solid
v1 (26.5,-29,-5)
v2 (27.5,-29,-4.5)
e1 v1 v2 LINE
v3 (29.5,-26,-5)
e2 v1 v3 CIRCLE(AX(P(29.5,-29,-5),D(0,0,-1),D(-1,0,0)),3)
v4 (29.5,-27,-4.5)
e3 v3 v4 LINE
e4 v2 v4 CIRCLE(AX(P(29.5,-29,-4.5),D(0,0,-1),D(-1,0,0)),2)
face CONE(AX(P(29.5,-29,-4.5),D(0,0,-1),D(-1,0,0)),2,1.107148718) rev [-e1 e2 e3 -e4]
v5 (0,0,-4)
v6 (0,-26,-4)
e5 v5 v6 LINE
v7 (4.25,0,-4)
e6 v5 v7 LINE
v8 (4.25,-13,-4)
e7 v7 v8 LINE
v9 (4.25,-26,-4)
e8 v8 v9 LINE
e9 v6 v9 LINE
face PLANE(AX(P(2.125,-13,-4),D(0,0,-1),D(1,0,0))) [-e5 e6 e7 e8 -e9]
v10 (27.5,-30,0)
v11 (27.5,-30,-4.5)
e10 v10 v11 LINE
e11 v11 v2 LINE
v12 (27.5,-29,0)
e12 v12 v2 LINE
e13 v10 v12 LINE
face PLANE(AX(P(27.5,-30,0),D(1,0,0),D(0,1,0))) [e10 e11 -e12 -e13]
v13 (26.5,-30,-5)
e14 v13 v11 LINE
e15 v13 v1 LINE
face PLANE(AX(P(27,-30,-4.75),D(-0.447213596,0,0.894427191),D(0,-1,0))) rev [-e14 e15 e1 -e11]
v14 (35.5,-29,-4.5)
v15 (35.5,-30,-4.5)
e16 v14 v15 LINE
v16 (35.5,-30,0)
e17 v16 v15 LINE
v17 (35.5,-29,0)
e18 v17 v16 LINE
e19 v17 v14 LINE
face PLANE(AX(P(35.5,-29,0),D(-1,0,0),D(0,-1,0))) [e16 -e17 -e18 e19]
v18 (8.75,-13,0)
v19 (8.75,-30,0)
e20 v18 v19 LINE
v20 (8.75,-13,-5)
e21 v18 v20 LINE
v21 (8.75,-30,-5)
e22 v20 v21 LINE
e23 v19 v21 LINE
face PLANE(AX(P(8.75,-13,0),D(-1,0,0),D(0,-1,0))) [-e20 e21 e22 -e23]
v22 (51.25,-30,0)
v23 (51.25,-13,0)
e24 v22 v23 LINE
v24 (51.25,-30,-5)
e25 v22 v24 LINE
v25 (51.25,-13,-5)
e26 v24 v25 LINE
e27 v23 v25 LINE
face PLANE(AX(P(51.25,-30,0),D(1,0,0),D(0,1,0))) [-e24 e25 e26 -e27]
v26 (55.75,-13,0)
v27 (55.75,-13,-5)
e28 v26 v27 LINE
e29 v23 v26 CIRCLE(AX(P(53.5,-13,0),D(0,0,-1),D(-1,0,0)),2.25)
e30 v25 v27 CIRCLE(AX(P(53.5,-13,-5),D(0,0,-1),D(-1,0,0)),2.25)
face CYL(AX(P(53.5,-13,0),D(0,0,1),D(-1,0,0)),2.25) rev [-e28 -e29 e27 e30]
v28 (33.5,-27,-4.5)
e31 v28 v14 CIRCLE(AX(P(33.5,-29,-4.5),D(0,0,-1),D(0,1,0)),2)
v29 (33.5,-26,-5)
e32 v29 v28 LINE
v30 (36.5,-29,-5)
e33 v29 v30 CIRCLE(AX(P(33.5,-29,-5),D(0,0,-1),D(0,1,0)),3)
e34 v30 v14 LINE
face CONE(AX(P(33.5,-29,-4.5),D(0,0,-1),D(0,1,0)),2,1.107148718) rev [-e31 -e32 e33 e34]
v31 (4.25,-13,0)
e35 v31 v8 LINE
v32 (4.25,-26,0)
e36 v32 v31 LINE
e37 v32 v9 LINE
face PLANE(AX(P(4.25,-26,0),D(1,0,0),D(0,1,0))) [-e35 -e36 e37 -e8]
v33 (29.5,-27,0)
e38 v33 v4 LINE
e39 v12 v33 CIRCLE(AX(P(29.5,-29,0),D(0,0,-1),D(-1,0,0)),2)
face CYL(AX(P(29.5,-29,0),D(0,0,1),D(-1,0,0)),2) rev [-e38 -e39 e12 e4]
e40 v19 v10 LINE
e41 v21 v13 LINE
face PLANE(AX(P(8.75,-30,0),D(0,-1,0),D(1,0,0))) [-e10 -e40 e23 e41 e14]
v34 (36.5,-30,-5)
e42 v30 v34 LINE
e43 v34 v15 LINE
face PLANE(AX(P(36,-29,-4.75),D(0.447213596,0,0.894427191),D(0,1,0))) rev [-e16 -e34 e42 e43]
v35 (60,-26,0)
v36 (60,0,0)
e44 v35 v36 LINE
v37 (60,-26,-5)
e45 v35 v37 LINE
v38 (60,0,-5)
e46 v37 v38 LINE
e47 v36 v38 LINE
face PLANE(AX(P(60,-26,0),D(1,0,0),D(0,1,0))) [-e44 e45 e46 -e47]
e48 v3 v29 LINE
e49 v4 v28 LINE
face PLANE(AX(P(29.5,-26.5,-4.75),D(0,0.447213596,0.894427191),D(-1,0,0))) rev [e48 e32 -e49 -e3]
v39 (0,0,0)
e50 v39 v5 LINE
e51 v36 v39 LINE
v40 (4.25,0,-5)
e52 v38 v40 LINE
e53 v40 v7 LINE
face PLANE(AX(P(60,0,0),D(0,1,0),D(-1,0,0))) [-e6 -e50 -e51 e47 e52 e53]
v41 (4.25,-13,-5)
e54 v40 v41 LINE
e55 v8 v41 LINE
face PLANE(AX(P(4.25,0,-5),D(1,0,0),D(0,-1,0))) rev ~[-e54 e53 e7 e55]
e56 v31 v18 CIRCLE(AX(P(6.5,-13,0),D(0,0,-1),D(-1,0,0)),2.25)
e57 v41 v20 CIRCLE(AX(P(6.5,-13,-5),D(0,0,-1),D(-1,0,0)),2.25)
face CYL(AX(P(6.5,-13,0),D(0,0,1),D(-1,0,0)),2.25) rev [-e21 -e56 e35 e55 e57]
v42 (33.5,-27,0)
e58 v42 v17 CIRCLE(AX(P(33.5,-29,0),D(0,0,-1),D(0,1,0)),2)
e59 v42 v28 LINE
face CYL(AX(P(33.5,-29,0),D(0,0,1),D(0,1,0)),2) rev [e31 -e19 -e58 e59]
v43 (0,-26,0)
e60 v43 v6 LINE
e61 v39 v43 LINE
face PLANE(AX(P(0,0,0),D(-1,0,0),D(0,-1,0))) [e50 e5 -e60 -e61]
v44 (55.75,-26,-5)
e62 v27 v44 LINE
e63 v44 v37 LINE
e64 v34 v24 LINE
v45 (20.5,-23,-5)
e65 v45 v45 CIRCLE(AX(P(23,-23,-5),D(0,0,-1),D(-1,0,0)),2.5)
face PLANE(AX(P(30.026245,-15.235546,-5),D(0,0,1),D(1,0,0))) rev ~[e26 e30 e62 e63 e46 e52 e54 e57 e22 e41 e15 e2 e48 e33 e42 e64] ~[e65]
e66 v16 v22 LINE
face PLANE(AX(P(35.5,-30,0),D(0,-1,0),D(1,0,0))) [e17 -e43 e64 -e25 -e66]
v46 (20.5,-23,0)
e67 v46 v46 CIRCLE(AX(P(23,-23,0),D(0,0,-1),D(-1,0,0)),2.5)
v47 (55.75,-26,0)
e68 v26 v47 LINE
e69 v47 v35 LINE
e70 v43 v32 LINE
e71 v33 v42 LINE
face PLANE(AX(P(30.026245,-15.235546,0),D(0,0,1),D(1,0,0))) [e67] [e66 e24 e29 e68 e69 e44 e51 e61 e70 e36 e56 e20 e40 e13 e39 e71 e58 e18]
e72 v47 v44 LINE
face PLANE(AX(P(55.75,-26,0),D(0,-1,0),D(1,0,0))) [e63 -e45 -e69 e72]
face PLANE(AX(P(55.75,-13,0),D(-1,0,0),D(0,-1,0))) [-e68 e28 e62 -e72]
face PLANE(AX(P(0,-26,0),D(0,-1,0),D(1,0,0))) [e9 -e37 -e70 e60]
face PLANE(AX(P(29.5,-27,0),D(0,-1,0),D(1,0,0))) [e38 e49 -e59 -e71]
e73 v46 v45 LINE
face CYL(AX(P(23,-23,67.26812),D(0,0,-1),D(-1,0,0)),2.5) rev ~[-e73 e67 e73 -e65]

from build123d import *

# Parameters (mm, degrees)
F1_DEPTH = 5
F2_D     = 5
F3_SIZE2 = 0.5
F3_SIZE  = 1
F4_W     = 4.25
F4_H     = 26
F5_DEPTH = 1


with BuildPart() as f1:
    # F0 (on Top) → F1 (new body)
    with BuildSketch(Plane.XY):
        with BuildLine():
            Line((60, 0), (0, 0))
            Line((0, 0), (0, -26))
            Line((0, -26), (4.25, -26))
            Line((4.25, -26), (4.25, -13))
            ThreePointArc((4.25, -13), (6.5, -10.75), (8.75, -13))
            Line((8.75, -13), (8.75, -30))
            Line((8.75, -30), (27.5, -30))
            Line((27.5, -30), (27.5, -29))
            ThreePointArc((27.5, -29), (28.0857864376, -27.5857864376), (29.5, -27))
            Line((29.5, -27), (33.5, -27))
            ThreePointArc((33.5, -27), (34.9142135624, -27.5857864376), (35.5, -29))
            Line((35.5, -29), (35.5, -30))
            Line((35.5, -30), (51.25, -30))
            Line((51.25, -30), (51.25, -13))
            ThreePointArc((51.25, -13), (53.5, -10.75), (55.75, -13))
            Line((55.75, -13), (55.75, -26))
            Line((55.75, -26), (60, -26))
            Line((60, -26), (60, 0))
        make_face()
    extrude(amount=-F1_DEPTH)

    # F2 (through all)
    with Locations(Plane.XY):
        with Locations((23, -23)):
            Hole(F2_D / 2)

    # F3
    f3_edges = [f1.edges().sort_by_distance(p)[0] for p in [
        (31.5, -27, -5),
    ]]
    f3_side = f1.faces().sort_by_distance((30.066886, -13.81093, -5))[0]
    chamfer(f3_edges, length=F3_SIZE, length2=F3_SIZE2, reference=f3_side)

    # F4 (on face) → F5 (cut)
    with BuildSketch(Plane(origin=(0, 0, -5), x_dir=(1, 0, 0), z_dir=(0, 0, -1))):
        with Locations((2.125, 13)):
            Rectangle(F4_W, F4_H)
    extrude(amount=-F5_DEPTH, mode=Mode.SUBTRACT)


solid = f1.part
